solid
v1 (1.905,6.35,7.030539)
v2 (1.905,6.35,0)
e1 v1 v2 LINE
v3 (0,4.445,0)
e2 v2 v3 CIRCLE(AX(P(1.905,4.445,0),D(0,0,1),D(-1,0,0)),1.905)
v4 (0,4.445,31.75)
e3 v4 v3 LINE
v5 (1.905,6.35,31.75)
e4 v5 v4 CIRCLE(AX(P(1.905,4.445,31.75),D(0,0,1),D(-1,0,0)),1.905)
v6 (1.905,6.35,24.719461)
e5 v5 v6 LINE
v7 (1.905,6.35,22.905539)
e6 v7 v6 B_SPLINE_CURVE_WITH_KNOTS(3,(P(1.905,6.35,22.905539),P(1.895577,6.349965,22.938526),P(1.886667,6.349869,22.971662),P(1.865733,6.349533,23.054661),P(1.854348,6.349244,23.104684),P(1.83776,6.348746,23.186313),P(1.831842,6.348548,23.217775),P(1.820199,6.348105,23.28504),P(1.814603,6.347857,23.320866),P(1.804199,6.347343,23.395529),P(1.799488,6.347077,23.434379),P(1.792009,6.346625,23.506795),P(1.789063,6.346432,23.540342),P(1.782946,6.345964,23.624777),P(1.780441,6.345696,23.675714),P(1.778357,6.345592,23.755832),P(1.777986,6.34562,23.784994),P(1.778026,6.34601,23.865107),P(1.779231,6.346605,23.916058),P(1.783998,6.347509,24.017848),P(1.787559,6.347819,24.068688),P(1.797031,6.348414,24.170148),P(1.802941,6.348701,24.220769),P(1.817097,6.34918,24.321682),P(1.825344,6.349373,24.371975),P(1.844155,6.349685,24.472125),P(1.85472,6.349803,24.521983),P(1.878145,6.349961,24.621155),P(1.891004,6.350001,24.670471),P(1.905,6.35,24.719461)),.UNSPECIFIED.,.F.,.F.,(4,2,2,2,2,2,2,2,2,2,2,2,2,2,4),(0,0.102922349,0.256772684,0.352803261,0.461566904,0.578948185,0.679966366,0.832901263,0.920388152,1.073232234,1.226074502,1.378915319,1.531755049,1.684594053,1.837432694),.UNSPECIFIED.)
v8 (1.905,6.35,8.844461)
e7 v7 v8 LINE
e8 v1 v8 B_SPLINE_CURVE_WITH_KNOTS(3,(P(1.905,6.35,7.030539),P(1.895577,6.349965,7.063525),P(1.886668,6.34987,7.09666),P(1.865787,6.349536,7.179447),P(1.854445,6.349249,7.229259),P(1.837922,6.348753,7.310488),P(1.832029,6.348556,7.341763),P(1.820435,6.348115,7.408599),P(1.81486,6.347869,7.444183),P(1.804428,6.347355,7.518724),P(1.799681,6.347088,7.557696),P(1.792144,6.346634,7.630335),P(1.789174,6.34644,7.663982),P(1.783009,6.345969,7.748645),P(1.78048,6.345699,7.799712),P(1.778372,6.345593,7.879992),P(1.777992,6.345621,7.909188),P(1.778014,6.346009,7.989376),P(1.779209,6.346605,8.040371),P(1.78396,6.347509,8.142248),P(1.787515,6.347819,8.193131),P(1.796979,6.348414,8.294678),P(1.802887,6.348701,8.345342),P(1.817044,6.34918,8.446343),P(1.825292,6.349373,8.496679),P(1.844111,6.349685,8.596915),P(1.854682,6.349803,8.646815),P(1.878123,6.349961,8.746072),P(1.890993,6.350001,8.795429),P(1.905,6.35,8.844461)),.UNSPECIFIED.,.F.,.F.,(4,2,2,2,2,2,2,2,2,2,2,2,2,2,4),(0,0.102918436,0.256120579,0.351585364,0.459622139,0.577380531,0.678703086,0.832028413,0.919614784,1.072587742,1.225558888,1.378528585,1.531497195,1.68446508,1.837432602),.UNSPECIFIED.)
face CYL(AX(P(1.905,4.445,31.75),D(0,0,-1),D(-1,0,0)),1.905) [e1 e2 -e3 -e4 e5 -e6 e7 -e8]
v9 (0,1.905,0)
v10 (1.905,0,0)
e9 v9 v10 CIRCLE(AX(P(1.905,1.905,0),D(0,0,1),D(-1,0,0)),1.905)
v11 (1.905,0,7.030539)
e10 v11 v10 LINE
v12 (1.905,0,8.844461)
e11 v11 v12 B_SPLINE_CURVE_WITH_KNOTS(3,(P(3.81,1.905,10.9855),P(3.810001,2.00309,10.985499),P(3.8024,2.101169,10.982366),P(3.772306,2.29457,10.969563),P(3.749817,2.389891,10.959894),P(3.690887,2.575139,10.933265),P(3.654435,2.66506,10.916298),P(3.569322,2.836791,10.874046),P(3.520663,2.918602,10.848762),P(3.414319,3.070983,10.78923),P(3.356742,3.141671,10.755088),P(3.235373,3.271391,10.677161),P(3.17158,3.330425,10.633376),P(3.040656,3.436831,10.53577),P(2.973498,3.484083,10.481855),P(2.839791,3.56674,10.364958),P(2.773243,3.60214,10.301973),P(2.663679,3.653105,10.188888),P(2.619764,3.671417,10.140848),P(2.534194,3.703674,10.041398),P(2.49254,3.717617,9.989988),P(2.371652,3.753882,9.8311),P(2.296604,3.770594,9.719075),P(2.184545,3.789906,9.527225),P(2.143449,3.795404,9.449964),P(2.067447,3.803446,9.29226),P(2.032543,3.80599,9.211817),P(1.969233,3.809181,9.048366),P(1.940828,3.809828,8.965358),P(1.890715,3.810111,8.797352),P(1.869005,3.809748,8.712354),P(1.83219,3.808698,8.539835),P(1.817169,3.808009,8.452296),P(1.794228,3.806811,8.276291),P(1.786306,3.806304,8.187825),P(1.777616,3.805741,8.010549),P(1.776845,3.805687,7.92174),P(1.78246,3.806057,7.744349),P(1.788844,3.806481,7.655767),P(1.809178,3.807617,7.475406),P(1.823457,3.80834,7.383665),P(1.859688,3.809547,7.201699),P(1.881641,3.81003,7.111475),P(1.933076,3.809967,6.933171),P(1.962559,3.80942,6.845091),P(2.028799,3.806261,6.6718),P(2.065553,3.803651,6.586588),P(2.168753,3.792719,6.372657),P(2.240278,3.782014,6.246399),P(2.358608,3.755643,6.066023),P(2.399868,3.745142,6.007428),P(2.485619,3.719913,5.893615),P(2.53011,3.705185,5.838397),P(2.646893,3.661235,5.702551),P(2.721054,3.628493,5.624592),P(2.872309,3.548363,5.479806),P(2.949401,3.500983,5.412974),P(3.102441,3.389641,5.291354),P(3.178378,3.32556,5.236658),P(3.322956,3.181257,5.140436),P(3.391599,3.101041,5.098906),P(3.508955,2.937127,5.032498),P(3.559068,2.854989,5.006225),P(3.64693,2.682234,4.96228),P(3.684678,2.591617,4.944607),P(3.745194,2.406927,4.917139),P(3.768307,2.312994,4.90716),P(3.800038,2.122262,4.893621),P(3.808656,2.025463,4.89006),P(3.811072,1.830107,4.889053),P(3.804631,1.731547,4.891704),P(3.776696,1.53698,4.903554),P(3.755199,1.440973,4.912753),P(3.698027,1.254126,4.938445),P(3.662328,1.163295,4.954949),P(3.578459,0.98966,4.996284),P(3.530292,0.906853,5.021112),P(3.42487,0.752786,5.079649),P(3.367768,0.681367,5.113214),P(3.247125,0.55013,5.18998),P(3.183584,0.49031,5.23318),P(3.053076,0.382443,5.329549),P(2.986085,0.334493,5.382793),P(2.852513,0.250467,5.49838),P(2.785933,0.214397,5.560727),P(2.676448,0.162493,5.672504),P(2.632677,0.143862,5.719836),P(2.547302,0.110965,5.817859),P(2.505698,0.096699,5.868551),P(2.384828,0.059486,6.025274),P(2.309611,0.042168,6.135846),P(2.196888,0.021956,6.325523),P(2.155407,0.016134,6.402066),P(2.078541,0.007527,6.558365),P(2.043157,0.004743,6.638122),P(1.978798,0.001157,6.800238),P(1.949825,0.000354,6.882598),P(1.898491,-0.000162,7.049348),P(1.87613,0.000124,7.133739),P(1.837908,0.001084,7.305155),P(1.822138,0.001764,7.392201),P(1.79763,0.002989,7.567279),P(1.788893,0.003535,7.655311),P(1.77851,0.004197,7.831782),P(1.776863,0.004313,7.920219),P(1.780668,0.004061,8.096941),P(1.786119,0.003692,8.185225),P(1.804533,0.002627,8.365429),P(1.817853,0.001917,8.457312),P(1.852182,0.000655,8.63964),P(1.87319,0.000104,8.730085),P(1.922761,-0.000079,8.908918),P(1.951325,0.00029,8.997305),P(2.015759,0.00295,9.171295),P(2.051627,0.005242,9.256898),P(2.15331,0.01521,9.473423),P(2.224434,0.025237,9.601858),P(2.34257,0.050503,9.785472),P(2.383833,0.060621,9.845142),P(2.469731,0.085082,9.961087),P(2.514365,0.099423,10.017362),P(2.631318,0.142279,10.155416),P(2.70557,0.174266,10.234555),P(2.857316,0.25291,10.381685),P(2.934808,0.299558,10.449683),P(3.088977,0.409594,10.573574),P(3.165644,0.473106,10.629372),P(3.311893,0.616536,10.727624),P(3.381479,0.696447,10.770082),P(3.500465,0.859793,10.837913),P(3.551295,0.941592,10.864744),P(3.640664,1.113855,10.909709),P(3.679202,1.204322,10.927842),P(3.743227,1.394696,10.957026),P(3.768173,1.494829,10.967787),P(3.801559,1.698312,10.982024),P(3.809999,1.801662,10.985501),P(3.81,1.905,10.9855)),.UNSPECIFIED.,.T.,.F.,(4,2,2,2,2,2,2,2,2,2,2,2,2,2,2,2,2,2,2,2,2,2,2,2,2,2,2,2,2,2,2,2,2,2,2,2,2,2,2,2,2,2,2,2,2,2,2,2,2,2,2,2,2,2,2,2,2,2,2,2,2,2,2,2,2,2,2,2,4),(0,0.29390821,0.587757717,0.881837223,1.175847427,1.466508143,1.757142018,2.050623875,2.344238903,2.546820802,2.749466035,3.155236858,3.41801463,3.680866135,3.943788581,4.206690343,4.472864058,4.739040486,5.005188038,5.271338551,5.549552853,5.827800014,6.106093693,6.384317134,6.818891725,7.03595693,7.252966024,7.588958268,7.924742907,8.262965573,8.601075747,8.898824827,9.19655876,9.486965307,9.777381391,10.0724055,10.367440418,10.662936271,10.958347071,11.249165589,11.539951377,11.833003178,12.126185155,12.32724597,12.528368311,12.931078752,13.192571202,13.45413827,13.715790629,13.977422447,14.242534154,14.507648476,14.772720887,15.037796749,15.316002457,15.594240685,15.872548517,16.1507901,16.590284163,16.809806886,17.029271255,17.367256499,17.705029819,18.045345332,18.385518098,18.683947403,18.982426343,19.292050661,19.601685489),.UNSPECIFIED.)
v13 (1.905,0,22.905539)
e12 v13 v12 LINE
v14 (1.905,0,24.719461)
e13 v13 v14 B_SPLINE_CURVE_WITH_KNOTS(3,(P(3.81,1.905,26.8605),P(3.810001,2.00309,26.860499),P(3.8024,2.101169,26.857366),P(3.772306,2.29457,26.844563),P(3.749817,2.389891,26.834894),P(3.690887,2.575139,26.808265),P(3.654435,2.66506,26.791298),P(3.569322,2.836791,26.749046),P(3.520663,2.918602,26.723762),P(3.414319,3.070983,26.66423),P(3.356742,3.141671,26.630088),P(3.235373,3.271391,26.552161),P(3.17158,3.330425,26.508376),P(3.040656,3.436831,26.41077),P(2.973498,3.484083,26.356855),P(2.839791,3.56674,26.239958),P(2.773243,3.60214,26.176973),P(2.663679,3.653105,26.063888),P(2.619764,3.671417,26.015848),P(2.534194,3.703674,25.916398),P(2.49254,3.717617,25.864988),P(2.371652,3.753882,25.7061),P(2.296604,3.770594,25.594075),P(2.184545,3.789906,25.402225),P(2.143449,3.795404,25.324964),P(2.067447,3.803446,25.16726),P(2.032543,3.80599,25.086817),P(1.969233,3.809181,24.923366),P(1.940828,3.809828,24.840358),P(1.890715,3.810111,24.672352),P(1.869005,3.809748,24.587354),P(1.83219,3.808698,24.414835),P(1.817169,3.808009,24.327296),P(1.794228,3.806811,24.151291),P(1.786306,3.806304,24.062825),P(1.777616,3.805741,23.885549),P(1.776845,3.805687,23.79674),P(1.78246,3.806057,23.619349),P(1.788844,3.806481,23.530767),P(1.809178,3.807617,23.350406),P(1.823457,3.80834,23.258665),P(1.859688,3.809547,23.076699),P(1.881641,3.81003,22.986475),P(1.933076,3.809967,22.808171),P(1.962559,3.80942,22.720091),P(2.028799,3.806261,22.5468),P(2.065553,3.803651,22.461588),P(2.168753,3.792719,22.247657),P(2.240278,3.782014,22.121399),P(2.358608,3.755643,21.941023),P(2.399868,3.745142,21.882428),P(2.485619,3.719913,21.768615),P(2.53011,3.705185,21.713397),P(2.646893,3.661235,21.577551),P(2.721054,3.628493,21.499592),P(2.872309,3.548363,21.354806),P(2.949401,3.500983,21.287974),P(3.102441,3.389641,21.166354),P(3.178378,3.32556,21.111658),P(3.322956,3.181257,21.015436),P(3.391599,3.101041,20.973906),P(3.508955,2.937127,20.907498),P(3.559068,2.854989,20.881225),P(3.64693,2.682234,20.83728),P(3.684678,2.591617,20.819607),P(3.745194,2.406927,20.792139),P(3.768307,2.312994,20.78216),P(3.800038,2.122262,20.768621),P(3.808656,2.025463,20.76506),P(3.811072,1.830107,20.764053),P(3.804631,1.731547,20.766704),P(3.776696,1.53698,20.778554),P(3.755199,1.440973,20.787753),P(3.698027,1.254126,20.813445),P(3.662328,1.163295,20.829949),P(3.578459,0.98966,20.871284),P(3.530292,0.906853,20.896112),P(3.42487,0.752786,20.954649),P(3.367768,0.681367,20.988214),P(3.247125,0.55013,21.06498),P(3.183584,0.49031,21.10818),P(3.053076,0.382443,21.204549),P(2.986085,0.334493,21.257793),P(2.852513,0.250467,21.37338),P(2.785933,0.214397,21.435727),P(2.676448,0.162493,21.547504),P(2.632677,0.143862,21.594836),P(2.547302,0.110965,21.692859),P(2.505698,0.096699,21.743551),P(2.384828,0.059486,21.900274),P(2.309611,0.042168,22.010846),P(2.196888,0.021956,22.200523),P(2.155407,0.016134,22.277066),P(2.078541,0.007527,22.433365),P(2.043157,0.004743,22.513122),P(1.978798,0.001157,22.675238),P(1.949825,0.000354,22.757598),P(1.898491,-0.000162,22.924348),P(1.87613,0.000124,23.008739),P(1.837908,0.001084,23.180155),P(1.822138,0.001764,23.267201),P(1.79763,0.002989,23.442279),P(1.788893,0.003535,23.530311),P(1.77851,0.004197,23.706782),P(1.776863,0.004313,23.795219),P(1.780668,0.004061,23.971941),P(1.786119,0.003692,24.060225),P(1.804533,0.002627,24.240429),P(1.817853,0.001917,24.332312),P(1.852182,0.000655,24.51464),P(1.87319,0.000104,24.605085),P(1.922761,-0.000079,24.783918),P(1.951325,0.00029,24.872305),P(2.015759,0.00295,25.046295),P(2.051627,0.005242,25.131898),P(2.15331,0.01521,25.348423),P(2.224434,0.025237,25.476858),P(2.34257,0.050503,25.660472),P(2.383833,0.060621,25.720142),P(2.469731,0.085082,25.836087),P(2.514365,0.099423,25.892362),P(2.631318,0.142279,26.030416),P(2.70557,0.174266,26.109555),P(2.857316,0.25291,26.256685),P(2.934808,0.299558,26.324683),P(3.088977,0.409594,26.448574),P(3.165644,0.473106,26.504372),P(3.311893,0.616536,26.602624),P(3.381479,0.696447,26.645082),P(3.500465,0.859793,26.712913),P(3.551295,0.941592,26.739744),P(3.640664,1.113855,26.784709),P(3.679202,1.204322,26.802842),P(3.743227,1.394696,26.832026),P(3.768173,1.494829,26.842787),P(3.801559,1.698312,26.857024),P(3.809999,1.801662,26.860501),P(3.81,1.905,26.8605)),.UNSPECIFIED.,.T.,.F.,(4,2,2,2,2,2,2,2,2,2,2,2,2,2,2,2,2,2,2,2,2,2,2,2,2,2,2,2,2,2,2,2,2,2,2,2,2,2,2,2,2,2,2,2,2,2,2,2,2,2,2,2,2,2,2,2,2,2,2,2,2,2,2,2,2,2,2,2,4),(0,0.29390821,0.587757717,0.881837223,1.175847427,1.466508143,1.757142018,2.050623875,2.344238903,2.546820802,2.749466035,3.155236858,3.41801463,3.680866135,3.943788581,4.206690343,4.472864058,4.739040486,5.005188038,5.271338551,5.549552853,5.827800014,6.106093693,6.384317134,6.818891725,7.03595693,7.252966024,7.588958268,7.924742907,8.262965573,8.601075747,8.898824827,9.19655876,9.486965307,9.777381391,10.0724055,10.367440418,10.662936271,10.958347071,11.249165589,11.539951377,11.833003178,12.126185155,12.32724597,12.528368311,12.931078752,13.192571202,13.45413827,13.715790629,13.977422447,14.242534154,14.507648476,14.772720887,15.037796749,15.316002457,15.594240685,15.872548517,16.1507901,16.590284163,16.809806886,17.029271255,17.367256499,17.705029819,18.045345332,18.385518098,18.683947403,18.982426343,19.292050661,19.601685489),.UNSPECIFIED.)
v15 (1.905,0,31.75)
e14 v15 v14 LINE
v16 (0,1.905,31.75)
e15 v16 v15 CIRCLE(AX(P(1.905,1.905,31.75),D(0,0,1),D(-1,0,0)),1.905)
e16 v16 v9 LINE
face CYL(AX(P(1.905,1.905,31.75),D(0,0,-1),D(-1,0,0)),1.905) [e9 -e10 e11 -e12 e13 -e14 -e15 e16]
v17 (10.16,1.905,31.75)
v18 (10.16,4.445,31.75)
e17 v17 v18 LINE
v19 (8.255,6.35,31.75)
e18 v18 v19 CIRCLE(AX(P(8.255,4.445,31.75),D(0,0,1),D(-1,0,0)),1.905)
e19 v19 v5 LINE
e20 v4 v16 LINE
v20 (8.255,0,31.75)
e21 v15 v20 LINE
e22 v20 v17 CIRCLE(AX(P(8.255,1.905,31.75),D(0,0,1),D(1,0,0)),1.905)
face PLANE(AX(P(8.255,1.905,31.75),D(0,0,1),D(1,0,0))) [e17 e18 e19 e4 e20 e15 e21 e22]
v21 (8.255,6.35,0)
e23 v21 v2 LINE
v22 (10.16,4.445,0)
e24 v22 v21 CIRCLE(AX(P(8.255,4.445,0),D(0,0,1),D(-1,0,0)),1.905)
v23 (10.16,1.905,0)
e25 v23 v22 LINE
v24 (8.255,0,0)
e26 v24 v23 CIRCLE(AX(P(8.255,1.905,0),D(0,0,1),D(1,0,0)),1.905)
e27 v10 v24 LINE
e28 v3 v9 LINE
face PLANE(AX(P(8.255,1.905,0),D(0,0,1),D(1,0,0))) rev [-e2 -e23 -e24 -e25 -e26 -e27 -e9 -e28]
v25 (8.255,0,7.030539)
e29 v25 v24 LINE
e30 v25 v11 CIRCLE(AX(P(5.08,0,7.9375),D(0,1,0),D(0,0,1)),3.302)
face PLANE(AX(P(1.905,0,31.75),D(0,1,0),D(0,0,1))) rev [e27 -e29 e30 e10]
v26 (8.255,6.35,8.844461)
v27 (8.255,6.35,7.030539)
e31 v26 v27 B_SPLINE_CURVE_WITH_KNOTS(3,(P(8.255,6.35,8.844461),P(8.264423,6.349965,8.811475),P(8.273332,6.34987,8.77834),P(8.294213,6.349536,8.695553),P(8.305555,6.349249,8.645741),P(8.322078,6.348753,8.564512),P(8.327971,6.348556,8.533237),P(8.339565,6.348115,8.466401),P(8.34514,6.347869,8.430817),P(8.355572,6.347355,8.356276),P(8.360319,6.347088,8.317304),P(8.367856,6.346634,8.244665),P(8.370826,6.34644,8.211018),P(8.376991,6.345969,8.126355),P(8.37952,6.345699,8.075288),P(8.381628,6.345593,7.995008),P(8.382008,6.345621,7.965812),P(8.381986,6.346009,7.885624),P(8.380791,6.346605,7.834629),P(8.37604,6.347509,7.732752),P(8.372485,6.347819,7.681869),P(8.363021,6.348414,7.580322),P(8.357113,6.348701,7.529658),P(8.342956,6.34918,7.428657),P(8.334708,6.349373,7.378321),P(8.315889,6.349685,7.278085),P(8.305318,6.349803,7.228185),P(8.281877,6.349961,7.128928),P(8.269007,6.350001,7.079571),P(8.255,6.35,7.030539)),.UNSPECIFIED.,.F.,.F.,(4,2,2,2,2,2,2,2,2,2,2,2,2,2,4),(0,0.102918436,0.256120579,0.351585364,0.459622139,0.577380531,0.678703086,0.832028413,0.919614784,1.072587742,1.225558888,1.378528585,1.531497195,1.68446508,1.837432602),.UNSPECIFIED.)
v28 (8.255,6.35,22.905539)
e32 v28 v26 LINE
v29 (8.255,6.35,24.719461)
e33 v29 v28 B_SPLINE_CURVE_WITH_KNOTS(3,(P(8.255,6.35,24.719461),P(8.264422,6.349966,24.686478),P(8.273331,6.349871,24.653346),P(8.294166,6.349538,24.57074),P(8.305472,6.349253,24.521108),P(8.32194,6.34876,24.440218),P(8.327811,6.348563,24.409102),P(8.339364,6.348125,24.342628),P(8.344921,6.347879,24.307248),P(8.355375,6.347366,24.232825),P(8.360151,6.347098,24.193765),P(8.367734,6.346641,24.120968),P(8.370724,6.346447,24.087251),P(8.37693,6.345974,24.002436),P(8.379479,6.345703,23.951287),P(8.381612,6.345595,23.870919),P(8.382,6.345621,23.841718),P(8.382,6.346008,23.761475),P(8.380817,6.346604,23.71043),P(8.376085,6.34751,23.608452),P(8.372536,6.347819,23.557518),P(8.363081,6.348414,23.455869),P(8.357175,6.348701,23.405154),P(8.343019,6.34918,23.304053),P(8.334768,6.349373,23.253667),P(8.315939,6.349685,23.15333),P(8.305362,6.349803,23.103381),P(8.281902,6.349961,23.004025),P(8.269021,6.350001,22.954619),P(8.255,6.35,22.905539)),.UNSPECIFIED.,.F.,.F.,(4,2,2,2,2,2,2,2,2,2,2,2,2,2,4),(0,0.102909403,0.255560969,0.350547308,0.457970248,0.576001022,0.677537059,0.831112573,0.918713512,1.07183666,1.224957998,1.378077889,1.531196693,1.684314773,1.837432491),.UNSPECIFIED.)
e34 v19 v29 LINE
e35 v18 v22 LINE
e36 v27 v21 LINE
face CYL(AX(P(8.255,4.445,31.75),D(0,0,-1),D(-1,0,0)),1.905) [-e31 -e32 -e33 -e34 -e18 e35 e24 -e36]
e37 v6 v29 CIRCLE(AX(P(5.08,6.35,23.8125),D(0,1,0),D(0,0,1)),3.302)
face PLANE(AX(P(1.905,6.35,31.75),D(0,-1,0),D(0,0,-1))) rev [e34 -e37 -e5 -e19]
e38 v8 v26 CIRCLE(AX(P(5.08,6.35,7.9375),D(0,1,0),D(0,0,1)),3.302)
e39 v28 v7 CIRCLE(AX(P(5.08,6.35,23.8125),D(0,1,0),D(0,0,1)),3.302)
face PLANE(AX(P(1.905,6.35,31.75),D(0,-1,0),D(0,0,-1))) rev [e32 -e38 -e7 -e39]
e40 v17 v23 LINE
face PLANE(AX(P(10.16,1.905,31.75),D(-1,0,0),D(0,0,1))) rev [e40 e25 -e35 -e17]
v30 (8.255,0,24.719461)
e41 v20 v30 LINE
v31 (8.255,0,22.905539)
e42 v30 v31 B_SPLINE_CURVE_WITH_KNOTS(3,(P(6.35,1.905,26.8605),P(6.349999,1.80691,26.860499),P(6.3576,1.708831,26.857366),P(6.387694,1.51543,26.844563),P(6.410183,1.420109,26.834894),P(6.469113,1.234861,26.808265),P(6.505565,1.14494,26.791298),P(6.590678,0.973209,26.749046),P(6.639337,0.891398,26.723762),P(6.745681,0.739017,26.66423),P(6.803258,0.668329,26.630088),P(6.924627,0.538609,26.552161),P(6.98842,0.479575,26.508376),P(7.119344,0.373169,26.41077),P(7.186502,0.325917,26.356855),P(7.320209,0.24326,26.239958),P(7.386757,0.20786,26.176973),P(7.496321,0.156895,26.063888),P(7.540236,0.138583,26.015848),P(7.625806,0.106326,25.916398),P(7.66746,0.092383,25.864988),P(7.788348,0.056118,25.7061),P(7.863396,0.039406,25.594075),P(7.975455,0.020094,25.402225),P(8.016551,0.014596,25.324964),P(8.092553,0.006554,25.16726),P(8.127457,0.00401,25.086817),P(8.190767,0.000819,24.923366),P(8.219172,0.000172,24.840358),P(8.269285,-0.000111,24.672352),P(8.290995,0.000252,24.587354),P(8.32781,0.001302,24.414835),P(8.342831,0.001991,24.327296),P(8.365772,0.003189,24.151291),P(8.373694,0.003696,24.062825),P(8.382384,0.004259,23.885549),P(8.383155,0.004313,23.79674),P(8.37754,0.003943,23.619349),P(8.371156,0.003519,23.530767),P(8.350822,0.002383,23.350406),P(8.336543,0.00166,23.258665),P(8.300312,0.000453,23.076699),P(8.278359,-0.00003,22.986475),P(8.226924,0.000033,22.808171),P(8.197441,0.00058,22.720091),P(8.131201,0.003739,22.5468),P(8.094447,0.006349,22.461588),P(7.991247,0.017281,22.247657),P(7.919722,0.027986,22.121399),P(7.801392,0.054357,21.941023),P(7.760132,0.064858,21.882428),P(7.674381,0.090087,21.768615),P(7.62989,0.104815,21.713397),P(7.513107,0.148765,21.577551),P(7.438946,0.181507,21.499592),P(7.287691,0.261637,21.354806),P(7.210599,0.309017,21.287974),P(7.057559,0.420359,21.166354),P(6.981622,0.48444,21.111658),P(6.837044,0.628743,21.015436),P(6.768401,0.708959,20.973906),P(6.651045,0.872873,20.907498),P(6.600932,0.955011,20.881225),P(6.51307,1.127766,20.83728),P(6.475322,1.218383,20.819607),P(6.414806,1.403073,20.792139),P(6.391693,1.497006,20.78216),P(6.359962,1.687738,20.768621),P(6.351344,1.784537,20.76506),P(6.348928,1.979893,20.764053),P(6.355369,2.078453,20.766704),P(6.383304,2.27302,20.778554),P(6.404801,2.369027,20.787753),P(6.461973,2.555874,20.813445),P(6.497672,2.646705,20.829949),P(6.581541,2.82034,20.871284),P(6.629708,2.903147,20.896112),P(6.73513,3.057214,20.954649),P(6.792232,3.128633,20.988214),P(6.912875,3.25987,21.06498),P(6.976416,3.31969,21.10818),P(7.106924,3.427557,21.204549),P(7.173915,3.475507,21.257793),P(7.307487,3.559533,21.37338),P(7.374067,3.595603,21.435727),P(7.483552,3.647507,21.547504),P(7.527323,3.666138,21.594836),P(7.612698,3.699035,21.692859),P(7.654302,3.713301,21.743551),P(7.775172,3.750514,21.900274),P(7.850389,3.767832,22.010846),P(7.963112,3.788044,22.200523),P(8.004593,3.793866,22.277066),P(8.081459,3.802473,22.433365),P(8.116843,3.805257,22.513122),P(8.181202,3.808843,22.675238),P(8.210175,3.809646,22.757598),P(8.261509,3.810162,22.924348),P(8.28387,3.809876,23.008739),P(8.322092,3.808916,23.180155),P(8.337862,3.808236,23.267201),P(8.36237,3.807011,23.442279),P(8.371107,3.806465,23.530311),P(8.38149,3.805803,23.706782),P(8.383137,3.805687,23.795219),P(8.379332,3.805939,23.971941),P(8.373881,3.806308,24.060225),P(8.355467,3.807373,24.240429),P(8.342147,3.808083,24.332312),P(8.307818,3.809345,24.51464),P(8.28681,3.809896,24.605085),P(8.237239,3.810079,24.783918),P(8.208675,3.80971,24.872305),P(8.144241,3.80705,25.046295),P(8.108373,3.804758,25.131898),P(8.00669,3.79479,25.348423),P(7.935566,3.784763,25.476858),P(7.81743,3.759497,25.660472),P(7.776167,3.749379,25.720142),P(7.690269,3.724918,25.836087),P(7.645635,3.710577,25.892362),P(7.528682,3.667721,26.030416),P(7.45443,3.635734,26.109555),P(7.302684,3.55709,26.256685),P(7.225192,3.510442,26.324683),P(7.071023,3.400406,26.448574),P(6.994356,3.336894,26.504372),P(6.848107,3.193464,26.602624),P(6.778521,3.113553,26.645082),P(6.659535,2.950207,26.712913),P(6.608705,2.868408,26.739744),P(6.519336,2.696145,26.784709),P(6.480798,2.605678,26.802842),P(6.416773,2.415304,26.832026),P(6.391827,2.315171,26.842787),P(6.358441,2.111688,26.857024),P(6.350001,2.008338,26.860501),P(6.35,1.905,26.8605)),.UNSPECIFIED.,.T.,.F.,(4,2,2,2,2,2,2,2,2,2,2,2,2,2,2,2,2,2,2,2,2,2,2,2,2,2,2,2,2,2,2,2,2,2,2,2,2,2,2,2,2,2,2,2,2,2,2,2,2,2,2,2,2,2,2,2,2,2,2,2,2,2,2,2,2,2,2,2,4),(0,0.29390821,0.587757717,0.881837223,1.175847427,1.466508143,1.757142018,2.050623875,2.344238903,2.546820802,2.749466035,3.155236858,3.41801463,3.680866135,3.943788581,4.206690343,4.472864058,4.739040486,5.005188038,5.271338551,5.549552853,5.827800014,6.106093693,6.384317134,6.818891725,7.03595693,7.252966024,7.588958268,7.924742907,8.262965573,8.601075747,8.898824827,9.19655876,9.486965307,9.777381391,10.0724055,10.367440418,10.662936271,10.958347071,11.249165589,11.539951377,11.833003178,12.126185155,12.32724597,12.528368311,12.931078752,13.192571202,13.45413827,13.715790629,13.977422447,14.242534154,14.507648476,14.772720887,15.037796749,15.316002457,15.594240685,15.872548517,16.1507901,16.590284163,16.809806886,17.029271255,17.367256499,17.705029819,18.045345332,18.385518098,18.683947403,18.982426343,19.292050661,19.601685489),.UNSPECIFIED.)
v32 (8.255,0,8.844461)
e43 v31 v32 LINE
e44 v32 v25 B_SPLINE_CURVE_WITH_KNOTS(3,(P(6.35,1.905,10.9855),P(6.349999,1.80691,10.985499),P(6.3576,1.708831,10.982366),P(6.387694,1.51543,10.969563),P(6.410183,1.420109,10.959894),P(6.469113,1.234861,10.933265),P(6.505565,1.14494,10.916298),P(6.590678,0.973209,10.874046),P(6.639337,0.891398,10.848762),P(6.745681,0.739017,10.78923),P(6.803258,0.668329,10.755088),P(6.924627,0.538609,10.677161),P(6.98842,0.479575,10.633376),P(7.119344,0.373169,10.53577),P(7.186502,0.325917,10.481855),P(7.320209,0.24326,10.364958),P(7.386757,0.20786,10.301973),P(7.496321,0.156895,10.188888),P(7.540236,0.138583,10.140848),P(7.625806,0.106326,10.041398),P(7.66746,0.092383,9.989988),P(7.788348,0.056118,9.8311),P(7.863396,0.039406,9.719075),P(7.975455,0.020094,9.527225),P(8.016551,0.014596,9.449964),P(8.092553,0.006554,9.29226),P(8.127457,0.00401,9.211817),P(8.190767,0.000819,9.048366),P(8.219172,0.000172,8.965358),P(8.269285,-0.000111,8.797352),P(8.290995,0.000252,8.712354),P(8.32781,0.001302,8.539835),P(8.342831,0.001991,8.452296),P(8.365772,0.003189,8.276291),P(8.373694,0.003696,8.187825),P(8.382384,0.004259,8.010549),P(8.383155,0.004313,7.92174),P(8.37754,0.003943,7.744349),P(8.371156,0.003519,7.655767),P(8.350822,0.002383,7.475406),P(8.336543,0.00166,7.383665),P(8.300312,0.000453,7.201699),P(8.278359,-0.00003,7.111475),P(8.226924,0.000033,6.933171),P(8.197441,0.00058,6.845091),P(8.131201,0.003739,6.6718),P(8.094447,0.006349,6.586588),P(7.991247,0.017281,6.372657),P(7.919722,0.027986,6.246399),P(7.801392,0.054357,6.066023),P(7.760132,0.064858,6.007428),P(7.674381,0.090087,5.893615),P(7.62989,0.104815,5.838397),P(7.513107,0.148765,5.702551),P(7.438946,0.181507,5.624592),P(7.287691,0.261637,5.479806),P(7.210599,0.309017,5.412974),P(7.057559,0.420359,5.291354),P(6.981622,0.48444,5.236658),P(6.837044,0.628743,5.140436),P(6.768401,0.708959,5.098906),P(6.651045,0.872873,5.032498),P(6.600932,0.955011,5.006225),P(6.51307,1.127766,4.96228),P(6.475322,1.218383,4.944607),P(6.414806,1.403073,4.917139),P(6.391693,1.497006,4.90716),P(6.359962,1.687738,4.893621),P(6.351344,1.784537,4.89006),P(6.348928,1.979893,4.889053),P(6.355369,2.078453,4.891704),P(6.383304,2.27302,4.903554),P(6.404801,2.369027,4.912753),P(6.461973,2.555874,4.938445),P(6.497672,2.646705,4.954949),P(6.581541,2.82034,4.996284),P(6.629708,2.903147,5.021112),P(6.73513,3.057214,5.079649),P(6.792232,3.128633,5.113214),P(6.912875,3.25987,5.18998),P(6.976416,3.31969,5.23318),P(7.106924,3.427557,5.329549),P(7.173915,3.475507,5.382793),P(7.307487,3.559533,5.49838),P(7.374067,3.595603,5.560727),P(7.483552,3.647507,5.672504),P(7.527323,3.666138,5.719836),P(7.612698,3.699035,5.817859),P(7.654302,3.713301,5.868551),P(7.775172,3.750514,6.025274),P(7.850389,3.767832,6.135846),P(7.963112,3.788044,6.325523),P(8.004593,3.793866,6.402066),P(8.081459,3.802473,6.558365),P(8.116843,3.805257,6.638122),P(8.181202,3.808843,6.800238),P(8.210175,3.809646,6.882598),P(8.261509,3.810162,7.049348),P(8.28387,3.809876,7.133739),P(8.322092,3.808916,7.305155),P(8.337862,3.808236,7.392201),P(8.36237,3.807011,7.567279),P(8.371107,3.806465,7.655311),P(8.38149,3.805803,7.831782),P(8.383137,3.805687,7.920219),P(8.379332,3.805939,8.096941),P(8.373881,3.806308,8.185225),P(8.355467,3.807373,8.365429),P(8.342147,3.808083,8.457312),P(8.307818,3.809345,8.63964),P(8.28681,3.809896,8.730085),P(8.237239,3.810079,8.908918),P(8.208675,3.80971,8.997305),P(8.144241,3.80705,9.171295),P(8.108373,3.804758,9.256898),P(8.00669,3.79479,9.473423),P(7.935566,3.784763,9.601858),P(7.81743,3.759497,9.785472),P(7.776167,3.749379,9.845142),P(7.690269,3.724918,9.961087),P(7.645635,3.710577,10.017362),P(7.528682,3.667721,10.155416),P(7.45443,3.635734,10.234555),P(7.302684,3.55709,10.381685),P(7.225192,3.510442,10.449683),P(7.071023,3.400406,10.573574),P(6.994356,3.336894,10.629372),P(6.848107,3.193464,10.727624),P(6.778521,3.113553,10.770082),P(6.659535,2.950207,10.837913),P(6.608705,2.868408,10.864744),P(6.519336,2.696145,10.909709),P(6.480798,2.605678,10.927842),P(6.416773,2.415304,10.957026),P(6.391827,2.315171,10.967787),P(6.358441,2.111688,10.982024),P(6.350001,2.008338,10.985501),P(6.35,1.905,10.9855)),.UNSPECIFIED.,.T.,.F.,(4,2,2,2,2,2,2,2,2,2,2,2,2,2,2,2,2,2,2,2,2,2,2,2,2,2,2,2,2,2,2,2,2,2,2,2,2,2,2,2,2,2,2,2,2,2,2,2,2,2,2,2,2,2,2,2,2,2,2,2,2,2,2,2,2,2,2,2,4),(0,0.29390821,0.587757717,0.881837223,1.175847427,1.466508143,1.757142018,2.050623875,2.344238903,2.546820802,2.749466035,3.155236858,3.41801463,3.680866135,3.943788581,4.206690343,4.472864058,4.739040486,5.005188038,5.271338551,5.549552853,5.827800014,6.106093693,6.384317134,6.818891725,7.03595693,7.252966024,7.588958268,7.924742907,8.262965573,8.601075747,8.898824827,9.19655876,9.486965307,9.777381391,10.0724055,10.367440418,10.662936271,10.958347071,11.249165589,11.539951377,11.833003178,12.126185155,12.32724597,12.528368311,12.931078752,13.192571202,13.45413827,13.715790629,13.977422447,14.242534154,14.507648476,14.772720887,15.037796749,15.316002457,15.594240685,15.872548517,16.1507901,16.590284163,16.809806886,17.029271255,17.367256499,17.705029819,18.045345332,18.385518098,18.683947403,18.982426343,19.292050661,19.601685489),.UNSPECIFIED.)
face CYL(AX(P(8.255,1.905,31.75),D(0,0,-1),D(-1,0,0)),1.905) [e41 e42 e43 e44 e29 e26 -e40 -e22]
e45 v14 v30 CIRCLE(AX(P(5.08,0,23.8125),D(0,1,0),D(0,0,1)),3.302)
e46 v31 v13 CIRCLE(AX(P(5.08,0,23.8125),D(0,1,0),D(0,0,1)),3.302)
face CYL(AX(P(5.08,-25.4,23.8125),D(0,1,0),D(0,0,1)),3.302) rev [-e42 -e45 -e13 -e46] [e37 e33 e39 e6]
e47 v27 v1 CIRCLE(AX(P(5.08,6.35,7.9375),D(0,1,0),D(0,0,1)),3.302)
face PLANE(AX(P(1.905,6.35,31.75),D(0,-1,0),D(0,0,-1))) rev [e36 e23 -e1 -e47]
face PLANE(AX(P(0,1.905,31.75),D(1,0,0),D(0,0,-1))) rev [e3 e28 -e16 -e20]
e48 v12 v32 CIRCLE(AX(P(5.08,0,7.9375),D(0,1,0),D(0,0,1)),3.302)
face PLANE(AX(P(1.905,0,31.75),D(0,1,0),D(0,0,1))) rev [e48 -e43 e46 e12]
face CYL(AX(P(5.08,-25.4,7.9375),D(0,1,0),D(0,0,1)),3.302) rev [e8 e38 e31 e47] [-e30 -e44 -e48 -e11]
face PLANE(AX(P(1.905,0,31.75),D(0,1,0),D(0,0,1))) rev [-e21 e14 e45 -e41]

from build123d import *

# Parameters (mm, degrees)
BOSS_EXTRUDE1_DEPTH = 31.75
SKETCH2_R           = 3.302
CUT_EXTRUDE1_DEPTH  = 31.75


with BuildPart() as part:
    # Sketch1 → Boss-Extrude1 (new body)
    with BuildSketch(Plane.XY):
        with BuildLine():
            Line((1.905, 0), (8.255, 0))
            ThreePointArc((8.255, 0), (9.602038418, 0.557961582), (10.16, 1.905))
            Line((10.16, 1.905), (10.16, 4.445))
            ThreePointArc((10.16, 4.445), (9.602038418, 5.792038418), (8.255, 6.35))
            Line((8.255, 6.35), (1.905, 6.35))
            ThreePointArc((1.905, 6.35), (0.557961582, 5.792038418), (0, 4.445))
            Line((0, 4.445), (0, 1.905))
            ThreePointArc((0, 1.905), (0.557961582, 0.557961582), (1.905, 0))
        make_face()
    extrude(amount=BOSS_EXTRUDE1_DEPTH)

    # Sketch2 → Cut-Extrude1 (cut)
    with BuildSketch(Plane(origin=(0, 6.35, 0), x_dir=(1, 0, 0), z_dir=(0, 1, 0))):
        with Locations((5.08, -7.9375)):
            Circle(SKETCH2_R)
        with Locations((5.08, -23.8125)):
            Circle(SKETCH2_R)
    extrude(amount=-CUT_EXTRUDE1_DEPTH, mode=Mode.SUBTRACT)


solid = part.part
